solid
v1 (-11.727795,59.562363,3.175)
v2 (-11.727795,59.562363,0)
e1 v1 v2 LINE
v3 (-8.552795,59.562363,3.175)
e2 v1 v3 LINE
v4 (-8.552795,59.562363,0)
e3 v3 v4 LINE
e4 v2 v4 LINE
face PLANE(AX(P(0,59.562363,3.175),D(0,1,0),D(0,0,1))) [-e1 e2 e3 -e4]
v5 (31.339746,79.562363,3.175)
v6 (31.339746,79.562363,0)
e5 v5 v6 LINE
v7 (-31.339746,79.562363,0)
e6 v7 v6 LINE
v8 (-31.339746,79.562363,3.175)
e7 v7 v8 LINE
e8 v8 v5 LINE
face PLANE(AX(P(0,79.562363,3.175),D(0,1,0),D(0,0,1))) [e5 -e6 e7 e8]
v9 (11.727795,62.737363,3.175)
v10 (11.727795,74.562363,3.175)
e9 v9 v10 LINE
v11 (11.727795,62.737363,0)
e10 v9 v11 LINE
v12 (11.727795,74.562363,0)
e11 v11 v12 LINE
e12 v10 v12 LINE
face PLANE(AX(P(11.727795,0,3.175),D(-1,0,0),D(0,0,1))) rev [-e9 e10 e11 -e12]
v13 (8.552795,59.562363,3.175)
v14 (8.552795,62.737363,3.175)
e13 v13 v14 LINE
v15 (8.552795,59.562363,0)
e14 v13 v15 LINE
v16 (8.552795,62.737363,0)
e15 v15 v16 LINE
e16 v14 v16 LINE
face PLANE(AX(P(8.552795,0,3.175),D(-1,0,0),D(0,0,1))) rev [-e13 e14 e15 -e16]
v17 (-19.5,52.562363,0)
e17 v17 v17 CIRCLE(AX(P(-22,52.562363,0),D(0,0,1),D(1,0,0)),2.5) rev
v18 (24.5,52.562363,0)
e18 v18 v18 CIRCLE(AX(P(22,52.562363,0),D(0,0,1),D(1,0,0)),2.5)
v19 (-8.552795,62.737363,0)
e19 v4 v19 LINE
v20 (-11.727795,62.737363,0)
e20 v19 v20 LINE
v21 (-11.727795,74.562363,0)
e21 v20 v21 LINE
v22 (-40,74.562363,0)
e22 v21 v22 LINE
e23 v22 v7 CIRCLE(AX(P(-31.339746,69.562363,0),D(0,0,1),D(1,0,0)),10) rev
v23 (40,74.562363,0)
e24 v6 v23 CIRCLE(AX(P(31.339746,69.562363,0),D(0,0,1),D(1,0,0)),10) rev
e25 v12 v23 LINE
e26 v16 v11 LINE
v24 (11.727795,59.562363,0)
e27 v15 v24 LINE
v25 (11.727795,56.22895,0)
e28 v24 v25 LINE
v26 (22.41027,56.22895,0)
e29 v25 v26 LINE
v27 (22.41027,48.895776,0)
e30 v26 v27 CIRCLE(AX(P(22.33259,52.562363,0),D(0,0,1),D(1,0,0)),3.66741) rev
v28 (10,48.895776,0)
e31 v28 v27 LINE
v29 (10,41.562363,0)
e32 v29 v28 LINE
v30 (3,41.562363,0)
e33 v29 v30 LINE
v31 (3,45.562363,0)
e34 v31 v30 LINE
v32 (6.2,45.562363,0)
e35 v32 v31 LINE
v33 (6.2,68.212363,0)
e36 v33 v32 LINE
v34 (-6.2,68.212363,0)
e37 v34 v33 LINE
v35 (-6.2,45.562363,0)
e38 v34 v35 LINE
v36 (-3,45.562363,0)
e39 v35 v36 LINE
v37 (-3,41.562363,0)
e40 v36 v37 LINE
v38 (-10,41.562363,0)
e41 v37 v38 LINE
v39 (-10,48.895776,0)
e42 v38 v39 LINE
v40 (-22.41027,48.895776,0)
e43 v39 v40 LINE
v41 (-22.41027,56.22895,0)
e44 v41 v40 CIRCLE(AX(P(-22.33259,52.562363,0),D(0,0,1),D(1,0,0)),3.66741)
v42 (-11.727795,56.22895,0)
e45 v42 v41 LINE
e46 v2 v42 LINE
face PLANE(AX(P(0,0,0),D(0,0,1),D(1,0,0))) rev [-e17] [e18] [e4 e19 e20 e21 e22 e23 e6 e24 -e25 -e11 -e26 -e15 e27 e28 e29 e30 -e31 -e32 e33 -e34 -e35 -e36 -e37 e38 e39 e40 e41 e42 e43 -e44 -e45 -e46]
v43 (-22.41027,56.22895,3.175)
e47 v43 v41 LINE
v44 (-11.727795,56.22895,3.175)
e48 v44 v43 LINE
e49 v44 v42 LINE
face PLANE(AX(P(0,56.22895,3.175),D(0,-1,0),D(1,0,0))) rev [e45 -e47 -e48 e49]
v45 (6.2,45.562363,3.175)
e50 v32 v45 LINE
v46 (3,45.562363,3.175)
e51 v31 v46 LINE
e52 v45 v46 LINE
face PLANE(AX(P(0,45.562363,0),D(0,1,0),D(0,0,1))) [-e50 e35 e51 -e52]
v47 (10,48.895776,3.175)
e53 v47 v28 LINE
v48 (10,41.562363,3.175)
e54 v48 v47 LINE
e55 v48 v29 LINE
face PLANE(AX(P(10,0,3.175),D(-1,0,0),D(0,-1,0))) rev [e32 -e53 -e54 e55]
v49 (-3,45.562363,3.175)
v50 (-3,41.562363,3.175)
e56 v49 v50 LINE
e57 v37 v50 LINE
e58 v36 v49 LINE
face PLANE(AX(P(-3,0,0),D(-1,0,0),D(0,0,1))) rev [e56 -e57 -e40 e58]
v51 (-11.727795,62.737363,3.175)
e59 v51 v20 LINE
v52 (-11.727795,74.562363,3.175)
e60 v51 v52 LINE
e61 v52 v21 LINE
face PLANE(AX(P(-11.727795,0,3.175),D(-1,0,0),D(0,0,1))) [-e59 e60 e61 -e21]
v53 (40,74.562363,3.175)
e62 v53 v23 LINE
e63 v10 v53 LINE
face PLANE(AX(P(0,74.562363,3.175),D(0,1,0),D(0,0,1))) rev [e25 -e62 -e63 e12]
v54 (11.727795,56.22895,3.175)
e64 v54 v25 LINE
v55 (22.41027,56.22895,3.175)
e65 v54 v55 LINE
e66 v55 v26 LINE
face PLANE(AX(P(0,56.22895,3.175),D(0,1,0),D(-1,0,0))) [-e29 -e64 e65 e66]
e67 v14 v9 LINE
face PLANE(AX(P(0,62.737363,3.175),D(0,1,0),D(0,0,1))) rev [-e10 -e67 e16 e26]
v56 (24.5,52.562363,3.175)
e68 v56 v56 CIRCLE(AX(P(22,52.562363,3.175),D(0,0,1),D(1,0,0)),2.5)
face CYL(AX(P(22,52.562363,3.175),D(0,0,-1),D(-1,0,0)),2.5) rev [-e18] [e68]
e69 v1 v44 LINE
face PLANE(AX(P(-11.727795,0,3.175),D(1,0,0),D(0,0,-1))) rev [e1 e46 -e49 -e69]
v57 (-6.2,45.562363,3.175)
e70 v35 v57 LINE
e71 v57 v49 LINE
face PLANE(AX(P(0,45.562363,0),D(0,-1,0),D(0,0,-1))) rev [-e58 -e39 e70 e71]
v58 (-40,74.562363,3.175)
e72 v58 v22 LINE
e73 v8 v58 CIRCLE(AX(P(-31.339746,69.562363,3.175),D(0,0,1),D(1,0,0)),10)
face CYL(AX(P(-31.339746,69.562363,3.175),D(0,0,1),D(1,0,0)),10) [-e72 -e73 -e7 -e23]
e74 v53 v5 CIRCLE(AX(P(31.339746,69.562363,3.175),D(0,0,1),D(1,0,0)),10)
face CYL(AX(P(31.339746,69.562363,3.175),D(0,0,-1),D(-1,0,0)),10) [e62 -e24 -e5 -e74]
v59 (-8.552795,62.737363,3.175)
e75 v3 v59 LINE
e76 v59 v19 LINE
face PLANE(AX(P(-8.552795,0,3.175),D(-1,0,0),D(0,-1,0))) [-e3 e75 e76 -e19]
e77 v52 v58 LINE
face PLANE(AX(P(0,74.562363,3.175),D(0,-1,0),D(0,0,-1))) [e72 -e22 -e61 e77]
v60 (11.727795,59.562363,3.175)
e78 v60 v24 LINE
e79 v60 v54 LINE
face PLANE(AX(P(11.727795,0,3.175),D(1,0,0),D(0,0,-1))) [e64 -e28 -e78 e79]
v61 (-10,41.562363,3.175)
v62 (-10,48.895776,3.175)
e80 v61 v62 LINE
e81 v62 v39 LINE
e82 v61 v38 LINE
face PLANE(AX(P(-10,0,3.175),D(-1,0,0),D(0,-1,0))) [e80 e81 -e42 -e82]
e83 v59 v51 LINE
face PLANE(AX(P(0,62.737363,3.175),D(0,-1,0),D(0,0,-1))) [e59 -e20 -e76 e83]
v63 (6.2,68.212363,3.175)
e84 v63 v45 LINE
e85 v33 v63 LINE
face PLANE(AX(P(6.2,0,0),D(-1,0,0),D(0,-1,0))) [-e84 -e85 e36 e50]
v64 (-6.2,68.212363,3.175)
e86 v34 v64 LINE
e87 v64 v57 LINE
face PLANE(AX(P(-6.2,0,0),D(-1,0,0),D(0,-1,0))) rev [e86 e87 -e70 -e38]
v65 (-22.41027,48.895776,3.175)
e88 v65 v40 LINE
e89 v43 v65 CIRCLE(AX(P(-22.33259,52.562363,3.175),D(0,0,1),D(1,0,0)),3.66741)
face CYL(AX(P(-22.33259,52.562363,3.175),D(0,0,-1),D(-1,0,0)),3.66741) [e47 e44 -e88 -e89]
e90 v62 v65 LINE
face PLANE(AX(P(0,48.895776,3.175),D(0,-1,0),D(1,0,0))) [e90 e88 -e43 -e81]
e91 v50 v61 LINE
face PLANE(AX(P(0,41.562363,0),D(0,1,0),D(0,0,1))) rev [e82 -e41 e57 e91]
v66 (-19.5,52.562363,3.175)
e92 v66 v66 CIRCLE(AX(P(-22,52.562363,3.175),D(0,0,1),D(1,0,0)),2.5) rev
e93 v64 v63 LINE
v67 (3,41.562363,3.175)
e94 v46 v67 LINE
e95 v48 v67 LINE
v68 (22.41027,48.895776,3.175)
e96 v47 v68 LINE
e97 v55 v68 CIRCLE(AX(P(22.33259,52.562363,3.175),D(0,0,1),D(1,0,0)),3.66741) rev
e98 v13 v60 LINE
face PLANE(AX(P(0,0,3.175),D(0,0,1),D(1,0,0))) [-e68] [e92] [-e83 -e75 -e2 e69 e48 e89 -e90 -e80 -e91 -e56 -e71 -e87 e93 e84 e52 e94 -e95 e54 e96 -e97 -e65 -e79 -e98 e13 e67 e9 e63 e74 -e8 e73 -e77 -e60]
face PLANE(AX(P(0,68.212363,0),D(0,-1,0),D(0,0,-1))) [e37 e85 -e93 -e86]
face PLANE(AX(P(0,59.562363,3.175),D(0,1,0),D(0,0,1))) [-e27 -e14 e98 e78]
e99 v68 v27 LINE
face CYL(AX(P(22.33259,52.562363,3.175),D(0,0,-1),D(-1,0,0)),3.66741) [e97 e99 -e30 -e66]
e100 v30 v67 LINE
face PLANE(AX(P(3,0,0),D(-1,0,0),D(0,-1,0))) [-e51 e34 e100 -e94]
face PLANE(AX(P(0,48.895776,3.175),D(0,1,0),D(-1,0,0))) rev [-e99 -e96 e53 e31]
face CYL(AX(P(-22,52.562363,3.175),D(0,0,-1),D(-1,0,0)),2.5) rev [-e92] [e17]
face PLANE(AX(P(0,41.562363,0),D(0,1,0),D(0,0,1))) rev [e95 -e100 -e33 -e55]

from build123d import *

# Parameters (mm, degrees)
SKETCH1_R           = 2.5
BOSS_EXTRUDE1_DEPTH = 3.175
FILLET1_R           = 10
SKETCH2_W           = 9
SKETCH2_H           = 21
CUT_EXTRUDE1_DEPTH  = 90.108082017
FILLET2_R           = 10
SKETCH4_W           = 90.343709808
SKETCH4_H           = 29.159436912
CUT_EXTRUDE3_DEPTH  = 83
CUT_EXTRUDE4_DEPTH  = 90.108082017


with BuildPart() as part:
    # Sketch1 → Boss-Extrude1 (new body)
    with BuildSketch(Plane.XY):
        with BuildLine():
            Line((-9.56, -38.262636689), (-9.56, -41.437636689))
            Line((-9.56, -41.437636689), (9.56, -41.437636689))
            Line((9.56, -41.437636689), (9.56, -38.262636689))
            Line((9.56, -38.262636689), (12.735, -38.262636689))
            Line((12.735, -38.262636689), (12.735, -41.437636689))
            Line((12.735, -41.437636689), (15.91, -41.437636689))
            Line((15.91, -41.437636689), (21.91, -41.437636689))
            Line((21.91, -41.437636689), (21.91, -32.437636689))
            Line((21.91, -32.437636689), (18.735, -32.437636689))
            Line((18.735, -32.437636689), (18.735, -20.437636689))
            Line((18.735, -20.437636689), (21.91, -20.437636689))
            Line((21.91, -20.437636689), (21.91, -9.437636689))
            Line((21.91, -9.437636689), (40, -9.437636689))
            Line((40, -9.437636689), (40, 30.562363311))
            Line((40, 30.562363311), (10, 30.562363311))
            Line((10, 30.562363311), (10, 45.562363311))
            Line((10, 45.562363311), (10, 48.89577614))
            Line((10, 48.89577614), (22.410269523, 48.89577614))
            ThreePointArc((22.410269523, 48.89577614), (26.000000001, 52.562363311), (22.410269523, 56.228950483))
            Line((22.410269523, 56.228950483), (11.727794547, 56.228950483))
            Line((11.727794547, 56.228950483), (11.727794547, 59.562363311))
            Line((11.727794547, 59.562363311), (10, 59.562363311))
            Line((10, 59.562363311), (8.552794547, 59.562363311))
            Line((8.552794547, 59.562363311), (8.552794547, 62.737363311))
            Line((8.552794547, 62.737363311), (11.727794547, 62.737363311))
            Line((11.727794547, 62.737363311), (11.727794547, 74.562363311))
            Line((11.727794547, 74.562363311), (40, 74.562363311))
            Line((40, 74.562363311), (40, 79.562363311))
            Line((40, 79.562363311), (0, 79.562363311))
            Line((0, 79.562363311), (-40, 79.562363311))
            Line((-40, 79.562363311), (-40, 74.562363311))
            Line((-40, 74.562363311), (-11.727794547, 74.562363311))
            Line((-11.727794547, 74.562363311), (-11.727794547, 62.737363311))
            Line((-11.727794547, 62.737363311), (-8.552794547, 62.737363311))
            Line((-8.552794547, 62.737363311), (-8.552794547, 59.562363311))
            Line((-8.552794547, 59.562363311), (-10, 59.562363311))
            Line((-10, 59.562363311), (-11.727794547, 59.562363311))
            Line((-11.727794547, 59.562363311), (-11.727794547, 56.228950483))
            Line((-11.727794547, 56.228950483), (-22.410269523, 56.228950483))
            ThreePointArc((-22.410269523, 56.228950483), (-26.000000001, 52.562363311), (-22.410269523, 48.89577614))
            Line((-22.410269523, 48.89577614), (-10, 48.89577614))
            Line((-10, 48.89577614), (-10, 45.562363311))
            Line((-10, 45.562363311), (-10, 30.562363311))
            Line((-10, 30.562363311), (-40, 30.562363311))
            Line((-40, 30.562363311), (-40, -9.437636689))
            Line((-40, -9.437636689), (-21.91, -9.437636689))
            Line((-21.91, -9.437636689), (-21.91, -20.437636689))
            Line((-21.91, -20.437636689), (-18.735, -20.437636689))
            Line((-18.735, -20.437636689), (-18.735, -32.437636689))
            Line((-18.735, -32.437636689), (-21.91, -32.437636689))
            Line((-21.91, -32.437636689), (-21.91, -41.437636689))
            Line((-21.91, -41.437636689), (-15.91, -41.437636689))
            Line((-15.91, -41.437636689), (-12.735, -41.437636689))
            Line((-12.735, -41.437636689), (-12.735, -38.262636689))
            Line((-12.735, -38.262636689), (-9.56, -38.262636689))
        make_face()
        with BuildLine():
            Line((4, 1.562363311), (-4, 1.562363311))
            ThreePointArc((-4, 1.562363311), (-4.707106781, 1.85525653), (-5, 2.562363311))
            Line((-5, 2.562363311), (-5, 3.562363311))
            ThreePointArc((-5, 3.562363311), (-4.707106781, 4.269470092), (-4, 4.562363311))
            Line((-4, 4.562363311), (4, 4.562363311))
            ThreePointArc((4, 4.562363311), (4.707106781, 4.269470092), (5, 3.562363311))
            Line((5, 3.562363311), (5, 2.562363311))
            ThreePointArc((5, 2.562363311), (4.707106781, 1.85525653), (4, 1.562363311))
        make_face(mode=Mode.SUBTRACT)
        with Locations((-22, 52.562363311)):
            Circle(SKETCH1_R, mode=Mode.SUBTRACT)
        with Locations((22, 52.562363311)):
            Circle(SKETCH1_R, mode=Mode.SUBTRACT)
    extrude(amount=BOSS_EXTRUDE1_DEPTH)

    # Fillet1
    # the kernel refuses this fillet: 10 mm, written as the material it takes off along each edge
    with BuildSketch(Plane(origin=(-40, 79.562363311, -21.650635095), x_dir=(0, -1, 0), z_dir=(0, 0, 1))) as fillet1_piece_1:
        with BuildLine():
            CenterArc((10, 8.660254038), FILLET1_R, 180, 60)
            Line((0, 8.660254038), (-0.2, 8.660254038))
            Line((-0.2, 8.660254038), (-0.2, 0))
            Line((-0.2, 0), (0, -0.2))
            ThreePointArc((0, -0.2), (2.5, -0.2), (4.9, -0.173205081))
            Line((4.9, -0.173205081), (5, 0))
        make_face()
    extrude(amount=46.476270189, mode=Mode.SUBTRACT)
    with BuildSketch(Plane(origin=(40, 79.562363311, -21.650635095), x_dir=(-1, 0, 0), z_dir=(0, 0, 1))) as fillet1_piece_2:
        with BuildLine():
            CenterArc((8.660254038, 10), FILLET1_R, 210, 60)
            Line((0, 5), (-0.173205081, 4.9))
            ThreePointArc((-0.173205081, 4.9), (-0.2, 2.5), (-0.2, 0))
            Line((-0.2, 0), (0, -0.2))
            Line((0, -0.2), (8.660254038, -0.2))
            Line((8.660254038, -0.2), (8.660254038, 0))
        make_face()
    extrude(amount=46.476270189, mode=Mode.SUBTRACT)

    # Sketch2 → Cut-Extrude1 (cut, through all)
    with BuildSketch(Plane.XY.offset(3.175)):
        with Locations((-12.61, -26.137636689)):
            Rectangle(SKETCH2_W, SKETCH2_H)
    extrude(amount=-CUT_EXTRUDE1_DEPTH, mode=Mode.SUBTRACT)

    # Fillet2
    fillet2_edges = [part.edges().sort_by_distance(p)[0] for p in [
        (40, 30.562363311, 1.5875),
        (40, -9.437636689, 1.5875),
        (-40, -9.437636689, 1.5875),
        (-40, 30.562363311, 1.5875),
    ]]
    fillet(fillet2_edges, radius=FILLET2_R)

    # Sketch4 → Cut-Extrude3 (cut)
    with BuildSketch(Plane.XZ.offset(41.437636689)):
        Rectangle(SKETCH4_W, SKETCH4_H)
    extrude(amount=-CUT_EXTRUDE3_DEPTH, mode=Mode.SUBTRACT)

    # Sketch5 → Cut-Extrude4 (cut, through all)
    with BuildSketch(Plane.XY.offset(3.175)):
        Polygon((6.2, 68.212363311), (-6.2, 68.212363311), (-6.2, 45.562363311), (-3, 45.562363311), (-3, 40.562363311), (-0.113822398, 40.562363311), (0.113822398, 40.562363311), (3, 40.562363311), (3, 45.562363311), (6.2, 45.562363311), align=None)
    extrude(amount=-CUT_EXTRUDE4_DEPTH, mode=Mode.SUBTRACT)


solid = part.part
